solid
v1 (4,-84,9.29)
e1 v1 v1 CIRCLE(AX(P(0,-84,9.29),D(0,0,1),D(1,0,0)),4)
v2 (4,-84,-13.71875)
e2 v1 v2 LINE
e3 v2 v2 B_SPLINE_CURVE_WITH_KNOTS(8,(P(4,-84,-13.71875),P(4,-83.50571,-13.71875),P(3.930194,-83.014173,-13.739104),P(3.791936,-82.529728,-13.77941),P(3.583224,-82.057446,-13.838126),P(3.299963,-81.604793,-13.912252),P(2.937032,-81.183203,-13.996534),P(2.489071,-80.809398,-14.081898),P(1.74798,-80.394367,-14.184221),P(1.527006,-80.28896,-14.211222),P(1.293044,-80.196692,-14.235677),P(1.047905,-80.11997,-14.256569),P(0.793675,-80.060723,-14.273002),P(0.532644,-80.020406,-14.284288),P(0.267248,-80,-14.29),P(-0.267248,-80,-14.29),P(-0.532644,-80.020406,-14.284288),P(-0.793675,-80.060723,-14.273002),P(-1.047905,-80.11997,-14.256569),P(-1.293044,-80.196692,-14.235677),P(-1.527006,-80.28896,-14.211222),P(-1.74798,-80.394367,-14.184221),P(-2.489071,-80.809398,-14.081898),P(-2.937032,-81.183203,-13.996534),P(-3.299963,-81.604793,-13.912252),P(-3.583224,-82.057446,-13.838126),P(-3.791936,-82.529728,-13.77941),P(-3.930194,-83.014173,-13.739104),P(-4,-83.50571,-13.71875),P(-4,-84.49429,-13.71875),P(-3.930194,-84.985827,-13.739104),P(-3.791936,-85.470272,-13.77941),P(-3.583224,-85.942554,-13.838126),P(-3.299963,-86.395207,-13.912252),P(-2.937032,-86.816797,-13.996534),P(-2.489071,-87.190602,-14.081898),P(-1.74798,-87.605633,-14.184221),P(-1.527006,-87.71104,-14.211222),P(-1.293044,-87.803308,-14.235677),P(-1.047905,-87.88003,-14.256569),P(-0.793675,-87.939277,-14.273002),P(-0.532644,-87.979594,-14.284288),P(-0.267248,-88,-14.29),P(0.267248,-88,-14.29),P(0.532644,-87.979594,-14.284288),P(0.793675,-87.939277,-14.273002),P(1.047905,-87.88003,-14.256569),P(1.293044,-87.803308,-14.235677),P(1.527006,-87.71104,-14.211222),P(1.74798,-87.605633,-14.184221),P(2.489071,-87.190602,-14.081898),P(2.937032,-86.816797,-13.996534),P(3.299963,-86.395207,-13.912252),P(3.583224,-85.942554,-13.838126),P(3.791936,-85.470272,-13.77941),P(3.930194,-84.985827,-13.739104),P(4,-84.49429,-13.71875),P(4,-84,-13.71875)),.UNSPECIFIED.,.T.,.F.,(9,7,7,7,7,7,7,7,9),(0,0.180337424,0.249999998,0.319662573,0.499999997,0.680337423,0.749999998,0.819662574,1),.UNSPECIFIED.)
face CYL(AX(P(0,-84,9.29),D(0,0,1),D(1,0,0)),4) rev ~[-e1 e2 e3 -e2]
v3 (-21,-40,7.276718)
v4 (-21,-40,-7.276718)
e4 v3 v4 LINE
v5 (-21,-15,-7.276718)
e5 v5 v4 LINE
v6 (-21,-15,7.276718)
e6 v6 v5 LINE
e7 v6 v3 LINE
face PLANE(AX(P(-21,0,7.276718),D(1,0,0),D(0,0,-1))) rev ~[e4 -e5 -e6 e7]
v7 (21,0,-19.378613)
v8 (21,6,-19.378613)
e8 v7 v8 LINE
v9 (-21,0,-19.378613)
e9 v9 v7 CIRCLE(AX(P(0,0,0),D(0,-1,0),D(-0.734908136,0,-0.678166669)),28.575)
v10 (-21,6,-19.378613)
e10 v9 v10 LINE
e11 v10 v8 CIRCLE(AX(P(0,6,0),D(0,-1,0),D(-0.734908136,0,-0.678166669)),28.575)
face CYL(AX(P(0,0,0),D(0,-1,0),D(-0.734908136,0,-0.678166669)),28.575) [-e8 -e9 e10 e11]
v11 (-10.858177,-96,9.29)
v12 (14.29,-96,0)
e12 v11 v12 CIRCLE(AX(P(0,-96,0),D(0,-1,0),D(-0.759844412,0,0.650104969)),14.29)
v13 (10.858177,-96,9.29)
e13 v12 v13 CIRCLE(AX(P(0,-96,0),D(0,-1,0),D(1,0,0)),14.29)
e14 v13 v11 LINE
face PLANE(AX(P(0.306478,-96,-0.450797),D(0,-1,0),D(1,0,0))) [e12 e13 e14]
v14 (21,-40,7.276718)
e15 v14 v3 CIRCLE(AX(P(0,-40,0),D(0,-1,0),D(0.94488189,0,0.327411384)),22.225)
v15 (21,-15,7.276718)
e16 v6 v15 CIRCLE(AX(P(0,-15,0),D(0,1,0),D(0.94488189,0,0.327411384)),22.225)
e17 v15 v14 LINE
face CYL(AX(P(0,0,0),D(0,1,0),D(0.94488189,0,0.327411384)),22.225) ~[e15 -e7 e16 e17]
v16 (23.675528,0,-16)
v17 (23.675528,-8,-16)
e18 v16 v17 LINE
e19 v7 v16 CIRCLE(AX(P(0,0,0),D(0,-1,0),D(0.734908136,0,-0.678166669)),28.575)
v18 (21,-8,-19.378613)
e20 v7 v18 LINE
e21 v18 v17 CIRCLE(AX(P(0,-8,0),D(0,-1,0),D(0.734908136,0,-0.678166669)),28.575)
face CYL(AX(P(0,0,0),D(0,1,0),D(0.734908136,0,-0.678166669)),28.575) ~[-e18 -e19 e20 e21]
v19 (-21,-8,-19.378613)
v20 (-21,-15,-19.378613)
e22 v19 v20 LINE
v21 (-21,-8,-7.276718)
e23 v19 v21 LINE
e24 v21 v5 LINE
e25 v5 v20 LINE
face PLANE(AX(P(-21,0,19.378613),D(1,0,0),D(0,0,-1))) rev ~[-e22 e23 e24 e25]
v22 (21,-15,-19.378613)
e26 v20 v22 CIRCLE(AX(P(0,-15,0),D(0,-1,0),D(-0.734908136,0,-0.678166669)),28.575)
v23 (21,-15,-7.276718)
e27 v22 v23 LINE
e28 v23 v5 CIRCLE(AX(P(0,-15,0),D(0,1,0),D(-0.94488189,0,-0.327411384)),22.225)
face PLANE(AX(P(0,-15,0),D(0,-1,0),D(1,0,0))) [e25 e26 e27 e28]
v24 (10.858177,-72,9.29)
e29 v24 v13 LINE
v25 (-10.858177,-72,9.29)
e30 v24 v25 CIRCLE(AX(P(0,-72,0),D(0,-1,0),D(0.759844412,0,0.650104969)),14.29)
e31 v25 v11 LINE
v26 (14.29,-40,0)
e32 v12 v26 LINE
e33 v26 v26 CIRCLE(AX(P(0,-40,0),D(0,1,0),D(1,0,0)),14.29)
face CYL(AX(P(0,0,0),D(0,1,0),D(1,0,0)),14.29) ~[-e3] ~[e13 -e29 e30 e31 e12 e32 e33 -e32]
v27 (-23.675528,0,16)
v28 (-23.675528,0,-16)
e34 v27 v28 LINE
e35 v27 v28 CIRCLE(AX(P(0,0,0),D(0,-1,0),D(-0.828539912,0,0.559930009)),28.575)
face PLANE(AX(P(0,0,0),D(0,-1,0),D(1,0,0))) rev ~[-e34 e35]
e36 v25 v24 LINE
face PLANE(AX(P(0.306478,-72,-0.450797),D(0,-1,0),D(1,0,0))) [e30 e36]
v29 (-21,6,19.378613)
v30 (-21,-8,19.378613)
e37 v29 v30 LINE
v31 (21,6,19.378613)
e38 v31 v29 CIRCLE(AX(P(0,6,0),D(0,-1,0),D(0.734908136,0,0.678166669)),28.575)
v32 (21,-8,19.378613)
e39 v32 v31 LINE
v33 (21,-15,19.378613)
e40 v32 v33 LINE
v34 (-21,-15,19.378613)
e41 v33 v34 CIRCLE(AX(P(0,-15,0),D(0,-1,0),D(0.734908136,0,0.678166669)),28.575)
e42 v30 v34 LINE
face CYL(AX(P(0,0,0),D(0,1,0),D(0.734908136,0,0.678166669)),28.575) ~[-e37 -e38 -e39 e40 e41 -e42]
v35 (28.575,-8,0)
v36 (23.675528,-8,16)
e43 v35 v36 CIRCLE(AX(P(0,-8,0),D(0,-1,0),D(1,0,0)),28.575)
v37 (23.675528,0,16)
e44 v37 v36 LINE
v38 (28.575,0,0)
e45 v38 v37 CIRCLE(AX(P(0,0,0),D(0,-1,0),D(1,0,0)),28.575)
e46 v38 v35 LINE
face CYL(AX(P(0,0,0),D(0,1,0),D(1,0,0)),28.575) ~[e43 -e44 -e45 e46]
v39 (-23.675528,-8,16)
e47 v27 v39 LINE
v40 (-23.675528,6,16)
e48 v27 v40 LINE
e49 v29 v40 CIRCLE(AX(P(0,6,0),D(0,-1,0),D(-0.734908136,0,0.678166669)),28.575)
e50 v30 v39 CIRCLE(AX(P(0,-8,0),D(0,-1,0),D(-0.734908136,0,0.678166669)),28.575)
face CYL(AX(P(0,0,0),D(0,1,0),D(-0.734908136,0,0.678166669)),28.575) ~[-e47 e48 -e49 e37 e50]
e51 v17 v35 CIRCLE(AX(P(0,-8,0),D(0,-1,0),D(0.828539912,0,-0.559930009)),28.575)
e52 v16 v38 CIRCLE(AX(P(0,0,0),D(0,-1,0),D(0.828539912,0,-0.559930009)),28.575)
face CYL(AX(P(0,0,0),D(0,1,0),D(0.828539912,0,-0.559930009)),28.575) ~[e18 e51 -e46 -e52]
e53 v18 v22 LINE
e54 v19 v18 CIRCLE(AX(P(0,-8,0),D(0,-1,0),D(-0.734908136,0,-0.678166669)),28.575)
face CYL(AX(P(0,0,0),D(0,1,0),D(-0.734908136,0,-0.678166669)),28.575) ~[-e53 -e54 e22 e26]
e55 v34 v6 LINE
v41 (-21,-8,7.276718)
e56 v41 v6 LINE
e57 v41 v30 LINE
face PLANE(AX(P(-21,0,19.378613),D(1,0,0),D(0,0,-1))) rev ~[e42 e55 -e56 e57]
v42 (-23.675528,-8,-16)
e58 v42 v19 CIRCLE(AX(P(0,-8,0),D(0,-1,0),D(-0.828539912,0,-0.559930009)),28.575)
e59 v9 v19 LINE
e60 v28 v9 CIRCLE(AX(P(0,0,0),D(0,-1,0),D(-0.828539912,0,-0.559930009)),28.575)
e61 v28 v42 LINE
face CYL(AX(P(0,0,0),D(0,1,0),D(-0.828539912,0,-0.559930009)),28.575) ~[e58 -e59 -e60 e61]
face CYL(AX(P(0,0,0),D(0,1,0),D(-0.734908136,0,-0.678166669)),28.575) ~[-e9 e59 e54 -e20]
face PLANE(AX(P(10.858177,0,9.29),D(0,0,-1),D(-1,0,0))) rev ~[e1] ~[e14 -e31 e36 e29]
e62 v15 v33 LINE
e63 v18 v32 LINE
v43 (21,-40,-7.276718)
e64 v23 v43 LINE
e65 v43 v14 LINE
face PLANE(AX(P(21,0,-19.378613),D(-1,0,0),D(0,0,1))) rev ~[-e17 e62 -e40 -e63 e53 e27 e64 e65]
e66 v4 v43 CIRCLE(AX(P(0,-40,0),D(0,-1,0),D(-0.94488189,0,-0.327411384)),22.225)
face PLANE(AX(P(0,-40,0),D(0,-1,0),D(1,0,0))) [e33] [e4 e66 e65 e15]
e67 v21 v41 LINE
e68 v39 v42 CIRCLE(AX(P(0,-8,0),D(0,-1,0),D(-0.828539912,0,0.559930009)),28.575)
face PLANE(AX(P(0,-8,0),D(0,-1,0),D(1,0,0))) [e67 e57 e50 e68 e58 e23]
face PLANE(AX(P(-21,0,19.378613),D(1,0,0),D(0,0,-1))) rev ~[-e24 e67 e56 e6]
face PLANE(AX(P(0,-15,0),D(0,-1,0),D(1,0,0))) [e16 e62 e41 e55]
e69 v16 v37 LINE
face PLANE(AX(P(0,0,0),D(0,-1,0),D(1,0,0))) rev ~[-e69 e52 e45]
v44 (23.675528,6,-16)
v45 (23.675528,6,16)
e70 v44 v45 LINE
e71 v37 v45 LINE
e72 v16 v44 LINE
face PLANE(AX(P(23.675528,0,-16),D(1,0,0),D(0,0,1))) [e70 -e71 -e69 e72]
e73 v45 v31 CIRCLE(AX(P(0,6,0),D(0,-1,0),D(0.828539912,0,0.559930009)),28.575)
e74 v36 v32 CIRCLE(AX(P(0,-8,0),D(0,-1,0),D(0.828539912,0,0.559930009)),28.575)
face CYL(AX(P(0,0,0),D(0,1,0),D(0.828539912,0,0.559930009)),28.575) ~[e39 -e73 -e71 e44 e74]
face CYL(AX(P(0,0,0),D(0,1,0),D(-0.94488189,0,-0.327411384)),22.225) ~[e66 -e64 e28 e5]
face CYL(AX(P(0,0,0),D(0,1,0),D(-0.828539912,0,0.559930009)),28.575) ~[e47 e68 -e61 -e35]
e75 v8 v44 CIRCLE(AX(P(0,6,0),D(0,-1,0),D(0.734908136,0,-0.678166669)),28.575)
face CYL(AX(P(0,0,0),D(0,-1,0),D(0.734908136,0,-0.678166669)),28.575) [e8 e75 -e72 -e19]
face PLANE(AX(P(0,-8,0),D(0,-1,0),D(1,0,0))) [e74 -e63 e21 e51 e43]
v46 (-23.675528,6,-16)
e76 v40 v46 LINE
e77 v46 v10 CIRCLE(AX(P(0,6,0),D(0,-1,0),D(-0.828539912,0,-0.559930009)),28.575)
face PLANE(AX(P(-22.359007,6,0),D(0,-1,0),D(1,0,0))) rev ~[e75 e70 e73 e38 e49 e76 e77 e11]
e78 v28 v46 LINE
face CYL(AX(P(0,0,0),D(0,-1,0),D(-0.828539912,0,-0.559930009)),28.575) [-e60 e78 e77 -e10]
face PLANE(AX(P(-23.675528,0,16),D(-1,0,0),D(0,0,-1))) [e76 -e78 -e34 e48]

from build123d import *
from build123d import SkipClean  # not in build123d's __all__

# Parameters (mm, degrees)
F1_DEPTH = 6
F2_DEPTH = 8
F3_DEPTH = 15
F4_DEPTH = 72
F5_DEPTH = 96
F6_DEPTH = 40
F7_R     = 4
F8_DEPTH = 25


# Not quite as in the source:
# - after a boolean that leaves OpenCascade's solid faulty, fix() repairs it


with BuildPart() as f1:
    # F0 (on Front) → F1 (new body)
    with BuildSketch(Plane.XZ):
        with BuildLine():
            Line((-21, 7.2767180102), (-21, 19.3786125664))
            ThreePointArc((-21, 19.3786125664), (-22.4015502975, 17.7398187497), (-23.6755279772, 16))
            Line((-23.6755279772, 16), (-23.6755279772, -16))
            ThreePointArc((-23.6755279772, -16), (-22.4015502975, -17.7398187497), (-21, -19.3786125664))
            Line((-21, -19.3786125664), (-21, -7.2767180102))
            ThreePointArc((-21, -7.2767180102), (-22.225, 0), (-21, 7.2767180102))
        make_face()
        with BuildLine():
            Line((-21, -7.2767180102), (-21, 7.2767180102))
            ThreePointArc((-21, 7.2767180102), (-22.225, 0), (-21, -7.2767180102))
        make_face()
        with BuildLine():
            Line((21, 7.2767180102), (21, 19.3786125664))
            ThreePointArc((21, 19.3786125664), (0, 28.575), (-21, 19.3786125664))
            Line((-21, 19.3786125664), (-21, 7.2767180102))
            ThreePointArc((-21, 7.2767180102), (0, 22.225), (21, 7.2767180102))
        make_face()
        with BuildLine():
            Line((21, -7.2767180102), (21, 7.2767180102))
            ThreePointArc((21, 7.2767180102), (0, 22.225), (-21, 7.2767180102))
            Line((-21, 7.2767180102), (-21, -7.2767180102))
            ThreePointArc((-21, -7.2767180102), (0, -22.225), (21, -7.2767180102))
        make_face()
        with BuildLine():
            ThreePointArc((10.8581766425, 9.29), (13.4046157017, 4.9518055181), (14.29, 0))
            ThreePointArc((14.29, 0), (-4.9518055181, -13.4046157017), (-10.8581766425, 9.29))
            ThreePointArc((-10.8581766425, 9.29), (0, 14.29), (10.8581766425, 9.29))
        make_face(mode=Mode.SUBTRACT)
        with BuildLine():
            ThreePointArc((-21, -19.3786125664), (0, -28.575), (21, -19.3786125664))
            Line((21, -19.3786125664), (21, -7.2767180102))
            ThreePointArc((21, -7.2767180102), (0, -22.225), (-21, -7.2767180102))
            Line((-21, -7.2767180102), (-21, -19.3786125664))
        make_face()
        with BuildLine():
            ThreePointArc((22.225, 0), (21.9166104245, 3.6895545124), (21, 7.2767180102))
            Line((21, 7.2767180102), (21, -7.2767180102))
            ThreePointArc((21, -7.2767180102), (21.9166104245, -3.6895545124), (22.225, 0))
        make_face()
        with BuildLine():
            Line((23.6755279772, -16), (23.6755279772, 16))
            ThreePointArc((23.6755279772, 16), (22.4015502975, 17.7398187497), (21, 19.3786125664))
            Line((21, 19.3786125664), (21, 7.2767180102))
            ThreePointArc((21, 7.2767180102), (21.9166104245, 3.6895545124), (22.225, 0))
            ThreePointArc((22.225, 0), (21.9166104245, -3.6895545124), (21, -7.2767180102))
            Line((21, -7.2767180102), (21, -19.3786125664))
            ThreePointArc((21, -19.3786125664), (22.4015502975, -17.7398187497), (23.6755279772, -16))
        make_face()
        with BuildLine():
            ThreePointArc((-10.8581766425, 9.29), (-4.9518055181, -13.4046157017), (14.29, 0))
            ThreePointArc((14.29, 0), (13.4046157017, 4.9518055181), (10.8581766425, 9.29))
            Line((10.8581766425, 9.29), (-10.8581766425, 9.29))
        make_face()
        with BuildLine():
            Line((-10.8581766425, 9.29), (10.8581766425, 9.29))
            ThreePointArc((10.8581766425, 9.29), (0, 14.29), (-10.8581766425, 9.29))
        make_face()
    extrude(amount=-F1_DEPTH)

    # F0 (on Front) → F2 (join)
    with BuildSketch(Plane.XZ):
        with BuildLine():
            Line((21, -7.2767180102), (21, 7.2767180102))
            ThreePointArc((21, 7.2767180102), (0, 22.225), (-21, 7.2767180102))
            Line((-21, 7.2767180102), (-21, -7.2767180102))
            ThreePointArc((-21, -7.2767180102), (0, -22.225), (21, -7.2767180102))
        make_face()
        with BuildLine():
            ThreePointArc((10.8581766425, 9.29), (13.4046157017, 4.9518055181), (14.29, 0))
            ThreePointArc((14.29, 0), (-4.9518055181, -13.4046157017), (-10.8581766425, 9.29))
            ThreePointArc((-10.8581766425, 9.29), (0, 14.29), (10.8581766425, 9.29))
        make_face(mode=Mode.SUBTRACT)
        with BuildLine():
            ThreePointArc((-10.8581766425, 9.29), (-4.9518055181, -13.4046157017), (14.29, 0))
            ThreePointArc((14.29, 0), (13.4046157017, 4.9518055181), (10.8581766425, 9.29))
            Line((10.8581766425, 9.29), (-10.8581766425, 9.29))
        make_face()
        with BuildLine():
            Line((21, 7.2767180102), (21, 19.3786125664))
            ThreePointArc((21, 19.3786125664), (0, 28.575), (-21, 19.3786125664))
            Line((-21, 19.3786125664), (-21, 7.2767180102))
            ThreePointArc((-21, 7.2767180102), (0, 22.225), (21, 7.2767180102))
        make_face()
        with BuildLine():
            ThreePointArc((-21, -19.3786125664), (0, -28.575), (21, -19.3786125664))
            Line((21, -19.3786125664), (21, -7.2767180102))
            ThreePointArc((21, -7.2767180102), (0, -22.225), (-21, -7.2767180102))
            Line((-21, -7.2767180102), (-21, -19.3786125664))
        make_face()
        with BuildLine():
            ThreePointArc((23.6755279772, -16), (27.3226905424, -8.3666723687), (28.575, 0))
            ThreePointArc((28.575, 0), (27.3226905424, 8.3666723687), (23.6755279772, 16))
            Line((23.6755279772, 16), (23.6755279772, -16))
        make_face()
        with BuildLine():
            Line((-23.6755279772, -16), (-23.6755279772, 16))
            ThreePointArc((-23.6755279772, 16), (-28.575, 0), (-23.6755279772, -16))
        make_face()
        with BuildLine():
            Line((23.6755279772, -16), (23.6755279772, 16))
            ThreePointArc((23.6755279772, 16), (22.4015502975, 17.7398187497), (21, 19.3786125664))
            Line((21, 19.3786125664), (21, 7.2767180102))
            ThreePointArc((21, 7.2767180102), (21.9166104245, 3.6895545124), (22.225, 0))
            ThreePointArc((22.225, 0), (21.9166104245, -3.6895545124), (21, -7.2767180102))
            Line((21, -7.2767180102), (21, -19.3786125664))
            ThreePointArc((21, -19.3786125664), (22.4015502975, -17.7398187497), (23.6755279772, -16))
        make_face()
        with BuildLine():
            Line((-21, 7.2767180102), (-21, 19.3786125664))
            ThreePointArc((-21, 19.3786125664), (-22.4015502975, 17.7398187497), (-23.6755279772, 16))
            Line((-23.6755279772, 16), (-23.6755279772, -16))
            ThreePointArc((-23.6755279772, -16), (-22.4015502975, -17.7398187497), (-21, -19.3786125664))
            Line((-21, -19.3786125664), (-21, -7.2767180102))
            ThreePointArc((-21, -7.2767180102), (-22.225, 0), (-21, 7.2767180102))
        make_face()
        with BuildLine():
            Line((-10.8581766425, 9.29), (10.8581766425, 9.29))
            ThreePointArc((10.8581766425, 9.29), (0, 14.29), (-10.8581766425, 9.29))
        make_face()
        with BuildLine():
            Line((-21, -7.2767180102), (-21, 7.2767180102))
            ThreePointArc((-21, 7.2767180102), (-22.225, 0), (-21, -7.2767180102))
        make_face()
        with BuildLine():
            ThreePointArc((22.225, 0), (21.9166104245, 3.6895545124), (21, 7.2767180102))
            Line((21, 7.2767180102), (21, -7.2767180102))
            ThreePointArc((21, -7.2767180102), (21.9166104245, -3.6895545124), (22.225, 0))
        make_face()
    with SkipClean():  # cleaning this boolean's faces spoils the solid; the shape is the same uncleaned
        extrude(amount=F2_DEPTH)

    # F0 (on Front) → F3 (join)
    with BuildSketch(Plane.XZ):
        with BuildLine():
            Line((21, -7.2767180102), (21, 7.2767180102))
            ThreePointArc((21, 7.2767180102), (0, 22.225), (-21, 7.2767180102))
            Line((-21, 7.2767180102), (-21, -7.2767180102))
            ThreePointArc((-21, -7.2767180102), (0, -22.225), (21, -7.2767180102))
        make_face()
        with BuildLine():
            ThreePointArc((10.8581766425, 9.29), (13.4046157017, 4.9518055181), (14.29, 0))
            ThreePointArc((14.29, 0), (-4.9518055181, -13.4046157017), (-10.8581766425, 9.29))
            ThreePointArc((-10.8581766425, 9.29), (0, 14.29), (10.8581766425, 9.29))
        make_face(mode=Mode.SUBTRACT)
        with BuildLine():
            ThreePointArc((-10.8581766425, 9.29), (-4.9518055181, -13.4046157017), (14.29, 0))
            ThreePointArc((14.29, 0), (13.4046157017, 4.9518055181), (10.8581766425, 9.29))
            Line((10.8581766425, 9.29), (-10.8581766425, 9.29))
        make_face()
        with BuildLine():
            Line((21, 7.2767180102), (21, 19.3786125664))
            ThreePointArc((21, 19.3786125664), (0, 28.575), (-21, 19.3786125664))
            Line((-21, 19.3786125664), (-21, 7.2767180102))
            ThreePointArc((-21, 7.2767180102), (0, 22.225), (21, 7.2767180102))
        make_face()
        with BuildLine():
            ThreePointArc((-21, -19.3786125664), (0, -28.575), (21, -19.3786125664))
            Line((21, -19.3786125664), (21, -7.2767180102))
            ThreePointArc((21, -7.2767180102), (0, -22.225), (-21, -7.2767180102))
            Line((-21, -7.2767180102), (-21, -19.3786125664))
        make_face()
        with BuildLine():
            Line((-10.8581766425, 9.29), (10.8581766425, 9.29))
            ThreePointArc((10.8581766425, 9.29), (0, 14.29), (-10.8581766425, 9.29))
        make_face()
    extrude(amount=F3_DEPTH)

    add(f1.part.fix(), mode=Mode.REPLACE)

    # F0 (on Front) → F4 (join)
    with BuildSketch(Plane.XZ):
        with BuildLine():
            ThreePointArc((-10.8581766425, 9.29), (-4.9518055181, -13.4046157017), (14.29, 0))
            ThreePointArc((14.29, 0), (13.4046157017, 4.9518055181), (10.8581766425, 9.29))
            Line((10.8581766425, 9.29), (-10.8581766425, 9.29))
        make_face()
        with BuildLine():
            Line((-10.8581766425, 9.29), (10.8581766425, 9.29))
            ThreePointArc((10.8581766425, 9.29), (0, 14.29), (-10.8581766425, 9.29))
        make_face()
    extrude(amount=F4_DEPTH)

    # F0 (on Front) → F5 (join)
    with BuildSketch(Plane.XZ):
        with BuildLine():
            ThreePointArc((-10.8581766425, 9.29), (-4.9518055181, -13.4046157017), (14.29, 0))
            ThreePointArc((14.29, 0), (13.4046157017, 4.9518055181), (10.8581766425, 9.29))
            Line((10.8581766425, 9.29), (-10.8581766425, 9.29))
        make_face()
    extrude(amount=F5_DEPTH)

    # F0 (on Front) → F6 (join)
    with BuildSketch(Plane.XZ):
        with BuildLine():
            Line((21, -7.2767180102), (21, 7.2767180102))
            ThreePointArc((21, 7.2767180102), (0, 22.225), (-21, 7.2767180102))
            Line((-21, 7.2767180102), (-21, -7.2767180102))
            ThreePointArc((-21, -7.2767180102), (0, -22.225), (21, -7.2767180102))
        make_face()
        with BuildLine():
            ThreePointArc((10.8581766425, 9.29), (13.4046157017, 4.9518055181), (14.29, 0))
            ThreePointArc((14.29, 0), (-4.9518055181, -13.4046157017), (-10.8581766425, 9.29))
            ThreePointArc((-10.8581766425, 9.29), (0, 14.29), (10.8581766425, 9.29))
        make_face(mode=Mode.SUBTRACT)
        with BuildLine():
            ThreePointArc((-10.8581766425, 9.29), (-4.9518055181, -13.4046157017), (14.29, 0))
            ThreePointArc((14.29, 0), (13.4046157017, 4.9518055181), (10.8581766425, 9.29))
            Line((10.8581766425, 9.29), (-10.8581766425, 9.29))
        make_face()
        with BuildLine():
            Line((-10.8581766425, 9.29), (10.8581766425, 9.29))
            ThreePointArc((10.8581766425, 9.29), (0, 14.29), (-10.8581766425, 9.29))
        make_face()
    extrude(amount=F6_DEPTH)

    # F7 (on face) → F8 (cut)
    with BuildSketch(Plane.XY.offset(9.29)):
        with Locations((0, -84)):
            Circle(F7_R)
    extrude(amount=-F8_DEPTH, mode=Mode.SUBTRACT)


solid = f1.part
